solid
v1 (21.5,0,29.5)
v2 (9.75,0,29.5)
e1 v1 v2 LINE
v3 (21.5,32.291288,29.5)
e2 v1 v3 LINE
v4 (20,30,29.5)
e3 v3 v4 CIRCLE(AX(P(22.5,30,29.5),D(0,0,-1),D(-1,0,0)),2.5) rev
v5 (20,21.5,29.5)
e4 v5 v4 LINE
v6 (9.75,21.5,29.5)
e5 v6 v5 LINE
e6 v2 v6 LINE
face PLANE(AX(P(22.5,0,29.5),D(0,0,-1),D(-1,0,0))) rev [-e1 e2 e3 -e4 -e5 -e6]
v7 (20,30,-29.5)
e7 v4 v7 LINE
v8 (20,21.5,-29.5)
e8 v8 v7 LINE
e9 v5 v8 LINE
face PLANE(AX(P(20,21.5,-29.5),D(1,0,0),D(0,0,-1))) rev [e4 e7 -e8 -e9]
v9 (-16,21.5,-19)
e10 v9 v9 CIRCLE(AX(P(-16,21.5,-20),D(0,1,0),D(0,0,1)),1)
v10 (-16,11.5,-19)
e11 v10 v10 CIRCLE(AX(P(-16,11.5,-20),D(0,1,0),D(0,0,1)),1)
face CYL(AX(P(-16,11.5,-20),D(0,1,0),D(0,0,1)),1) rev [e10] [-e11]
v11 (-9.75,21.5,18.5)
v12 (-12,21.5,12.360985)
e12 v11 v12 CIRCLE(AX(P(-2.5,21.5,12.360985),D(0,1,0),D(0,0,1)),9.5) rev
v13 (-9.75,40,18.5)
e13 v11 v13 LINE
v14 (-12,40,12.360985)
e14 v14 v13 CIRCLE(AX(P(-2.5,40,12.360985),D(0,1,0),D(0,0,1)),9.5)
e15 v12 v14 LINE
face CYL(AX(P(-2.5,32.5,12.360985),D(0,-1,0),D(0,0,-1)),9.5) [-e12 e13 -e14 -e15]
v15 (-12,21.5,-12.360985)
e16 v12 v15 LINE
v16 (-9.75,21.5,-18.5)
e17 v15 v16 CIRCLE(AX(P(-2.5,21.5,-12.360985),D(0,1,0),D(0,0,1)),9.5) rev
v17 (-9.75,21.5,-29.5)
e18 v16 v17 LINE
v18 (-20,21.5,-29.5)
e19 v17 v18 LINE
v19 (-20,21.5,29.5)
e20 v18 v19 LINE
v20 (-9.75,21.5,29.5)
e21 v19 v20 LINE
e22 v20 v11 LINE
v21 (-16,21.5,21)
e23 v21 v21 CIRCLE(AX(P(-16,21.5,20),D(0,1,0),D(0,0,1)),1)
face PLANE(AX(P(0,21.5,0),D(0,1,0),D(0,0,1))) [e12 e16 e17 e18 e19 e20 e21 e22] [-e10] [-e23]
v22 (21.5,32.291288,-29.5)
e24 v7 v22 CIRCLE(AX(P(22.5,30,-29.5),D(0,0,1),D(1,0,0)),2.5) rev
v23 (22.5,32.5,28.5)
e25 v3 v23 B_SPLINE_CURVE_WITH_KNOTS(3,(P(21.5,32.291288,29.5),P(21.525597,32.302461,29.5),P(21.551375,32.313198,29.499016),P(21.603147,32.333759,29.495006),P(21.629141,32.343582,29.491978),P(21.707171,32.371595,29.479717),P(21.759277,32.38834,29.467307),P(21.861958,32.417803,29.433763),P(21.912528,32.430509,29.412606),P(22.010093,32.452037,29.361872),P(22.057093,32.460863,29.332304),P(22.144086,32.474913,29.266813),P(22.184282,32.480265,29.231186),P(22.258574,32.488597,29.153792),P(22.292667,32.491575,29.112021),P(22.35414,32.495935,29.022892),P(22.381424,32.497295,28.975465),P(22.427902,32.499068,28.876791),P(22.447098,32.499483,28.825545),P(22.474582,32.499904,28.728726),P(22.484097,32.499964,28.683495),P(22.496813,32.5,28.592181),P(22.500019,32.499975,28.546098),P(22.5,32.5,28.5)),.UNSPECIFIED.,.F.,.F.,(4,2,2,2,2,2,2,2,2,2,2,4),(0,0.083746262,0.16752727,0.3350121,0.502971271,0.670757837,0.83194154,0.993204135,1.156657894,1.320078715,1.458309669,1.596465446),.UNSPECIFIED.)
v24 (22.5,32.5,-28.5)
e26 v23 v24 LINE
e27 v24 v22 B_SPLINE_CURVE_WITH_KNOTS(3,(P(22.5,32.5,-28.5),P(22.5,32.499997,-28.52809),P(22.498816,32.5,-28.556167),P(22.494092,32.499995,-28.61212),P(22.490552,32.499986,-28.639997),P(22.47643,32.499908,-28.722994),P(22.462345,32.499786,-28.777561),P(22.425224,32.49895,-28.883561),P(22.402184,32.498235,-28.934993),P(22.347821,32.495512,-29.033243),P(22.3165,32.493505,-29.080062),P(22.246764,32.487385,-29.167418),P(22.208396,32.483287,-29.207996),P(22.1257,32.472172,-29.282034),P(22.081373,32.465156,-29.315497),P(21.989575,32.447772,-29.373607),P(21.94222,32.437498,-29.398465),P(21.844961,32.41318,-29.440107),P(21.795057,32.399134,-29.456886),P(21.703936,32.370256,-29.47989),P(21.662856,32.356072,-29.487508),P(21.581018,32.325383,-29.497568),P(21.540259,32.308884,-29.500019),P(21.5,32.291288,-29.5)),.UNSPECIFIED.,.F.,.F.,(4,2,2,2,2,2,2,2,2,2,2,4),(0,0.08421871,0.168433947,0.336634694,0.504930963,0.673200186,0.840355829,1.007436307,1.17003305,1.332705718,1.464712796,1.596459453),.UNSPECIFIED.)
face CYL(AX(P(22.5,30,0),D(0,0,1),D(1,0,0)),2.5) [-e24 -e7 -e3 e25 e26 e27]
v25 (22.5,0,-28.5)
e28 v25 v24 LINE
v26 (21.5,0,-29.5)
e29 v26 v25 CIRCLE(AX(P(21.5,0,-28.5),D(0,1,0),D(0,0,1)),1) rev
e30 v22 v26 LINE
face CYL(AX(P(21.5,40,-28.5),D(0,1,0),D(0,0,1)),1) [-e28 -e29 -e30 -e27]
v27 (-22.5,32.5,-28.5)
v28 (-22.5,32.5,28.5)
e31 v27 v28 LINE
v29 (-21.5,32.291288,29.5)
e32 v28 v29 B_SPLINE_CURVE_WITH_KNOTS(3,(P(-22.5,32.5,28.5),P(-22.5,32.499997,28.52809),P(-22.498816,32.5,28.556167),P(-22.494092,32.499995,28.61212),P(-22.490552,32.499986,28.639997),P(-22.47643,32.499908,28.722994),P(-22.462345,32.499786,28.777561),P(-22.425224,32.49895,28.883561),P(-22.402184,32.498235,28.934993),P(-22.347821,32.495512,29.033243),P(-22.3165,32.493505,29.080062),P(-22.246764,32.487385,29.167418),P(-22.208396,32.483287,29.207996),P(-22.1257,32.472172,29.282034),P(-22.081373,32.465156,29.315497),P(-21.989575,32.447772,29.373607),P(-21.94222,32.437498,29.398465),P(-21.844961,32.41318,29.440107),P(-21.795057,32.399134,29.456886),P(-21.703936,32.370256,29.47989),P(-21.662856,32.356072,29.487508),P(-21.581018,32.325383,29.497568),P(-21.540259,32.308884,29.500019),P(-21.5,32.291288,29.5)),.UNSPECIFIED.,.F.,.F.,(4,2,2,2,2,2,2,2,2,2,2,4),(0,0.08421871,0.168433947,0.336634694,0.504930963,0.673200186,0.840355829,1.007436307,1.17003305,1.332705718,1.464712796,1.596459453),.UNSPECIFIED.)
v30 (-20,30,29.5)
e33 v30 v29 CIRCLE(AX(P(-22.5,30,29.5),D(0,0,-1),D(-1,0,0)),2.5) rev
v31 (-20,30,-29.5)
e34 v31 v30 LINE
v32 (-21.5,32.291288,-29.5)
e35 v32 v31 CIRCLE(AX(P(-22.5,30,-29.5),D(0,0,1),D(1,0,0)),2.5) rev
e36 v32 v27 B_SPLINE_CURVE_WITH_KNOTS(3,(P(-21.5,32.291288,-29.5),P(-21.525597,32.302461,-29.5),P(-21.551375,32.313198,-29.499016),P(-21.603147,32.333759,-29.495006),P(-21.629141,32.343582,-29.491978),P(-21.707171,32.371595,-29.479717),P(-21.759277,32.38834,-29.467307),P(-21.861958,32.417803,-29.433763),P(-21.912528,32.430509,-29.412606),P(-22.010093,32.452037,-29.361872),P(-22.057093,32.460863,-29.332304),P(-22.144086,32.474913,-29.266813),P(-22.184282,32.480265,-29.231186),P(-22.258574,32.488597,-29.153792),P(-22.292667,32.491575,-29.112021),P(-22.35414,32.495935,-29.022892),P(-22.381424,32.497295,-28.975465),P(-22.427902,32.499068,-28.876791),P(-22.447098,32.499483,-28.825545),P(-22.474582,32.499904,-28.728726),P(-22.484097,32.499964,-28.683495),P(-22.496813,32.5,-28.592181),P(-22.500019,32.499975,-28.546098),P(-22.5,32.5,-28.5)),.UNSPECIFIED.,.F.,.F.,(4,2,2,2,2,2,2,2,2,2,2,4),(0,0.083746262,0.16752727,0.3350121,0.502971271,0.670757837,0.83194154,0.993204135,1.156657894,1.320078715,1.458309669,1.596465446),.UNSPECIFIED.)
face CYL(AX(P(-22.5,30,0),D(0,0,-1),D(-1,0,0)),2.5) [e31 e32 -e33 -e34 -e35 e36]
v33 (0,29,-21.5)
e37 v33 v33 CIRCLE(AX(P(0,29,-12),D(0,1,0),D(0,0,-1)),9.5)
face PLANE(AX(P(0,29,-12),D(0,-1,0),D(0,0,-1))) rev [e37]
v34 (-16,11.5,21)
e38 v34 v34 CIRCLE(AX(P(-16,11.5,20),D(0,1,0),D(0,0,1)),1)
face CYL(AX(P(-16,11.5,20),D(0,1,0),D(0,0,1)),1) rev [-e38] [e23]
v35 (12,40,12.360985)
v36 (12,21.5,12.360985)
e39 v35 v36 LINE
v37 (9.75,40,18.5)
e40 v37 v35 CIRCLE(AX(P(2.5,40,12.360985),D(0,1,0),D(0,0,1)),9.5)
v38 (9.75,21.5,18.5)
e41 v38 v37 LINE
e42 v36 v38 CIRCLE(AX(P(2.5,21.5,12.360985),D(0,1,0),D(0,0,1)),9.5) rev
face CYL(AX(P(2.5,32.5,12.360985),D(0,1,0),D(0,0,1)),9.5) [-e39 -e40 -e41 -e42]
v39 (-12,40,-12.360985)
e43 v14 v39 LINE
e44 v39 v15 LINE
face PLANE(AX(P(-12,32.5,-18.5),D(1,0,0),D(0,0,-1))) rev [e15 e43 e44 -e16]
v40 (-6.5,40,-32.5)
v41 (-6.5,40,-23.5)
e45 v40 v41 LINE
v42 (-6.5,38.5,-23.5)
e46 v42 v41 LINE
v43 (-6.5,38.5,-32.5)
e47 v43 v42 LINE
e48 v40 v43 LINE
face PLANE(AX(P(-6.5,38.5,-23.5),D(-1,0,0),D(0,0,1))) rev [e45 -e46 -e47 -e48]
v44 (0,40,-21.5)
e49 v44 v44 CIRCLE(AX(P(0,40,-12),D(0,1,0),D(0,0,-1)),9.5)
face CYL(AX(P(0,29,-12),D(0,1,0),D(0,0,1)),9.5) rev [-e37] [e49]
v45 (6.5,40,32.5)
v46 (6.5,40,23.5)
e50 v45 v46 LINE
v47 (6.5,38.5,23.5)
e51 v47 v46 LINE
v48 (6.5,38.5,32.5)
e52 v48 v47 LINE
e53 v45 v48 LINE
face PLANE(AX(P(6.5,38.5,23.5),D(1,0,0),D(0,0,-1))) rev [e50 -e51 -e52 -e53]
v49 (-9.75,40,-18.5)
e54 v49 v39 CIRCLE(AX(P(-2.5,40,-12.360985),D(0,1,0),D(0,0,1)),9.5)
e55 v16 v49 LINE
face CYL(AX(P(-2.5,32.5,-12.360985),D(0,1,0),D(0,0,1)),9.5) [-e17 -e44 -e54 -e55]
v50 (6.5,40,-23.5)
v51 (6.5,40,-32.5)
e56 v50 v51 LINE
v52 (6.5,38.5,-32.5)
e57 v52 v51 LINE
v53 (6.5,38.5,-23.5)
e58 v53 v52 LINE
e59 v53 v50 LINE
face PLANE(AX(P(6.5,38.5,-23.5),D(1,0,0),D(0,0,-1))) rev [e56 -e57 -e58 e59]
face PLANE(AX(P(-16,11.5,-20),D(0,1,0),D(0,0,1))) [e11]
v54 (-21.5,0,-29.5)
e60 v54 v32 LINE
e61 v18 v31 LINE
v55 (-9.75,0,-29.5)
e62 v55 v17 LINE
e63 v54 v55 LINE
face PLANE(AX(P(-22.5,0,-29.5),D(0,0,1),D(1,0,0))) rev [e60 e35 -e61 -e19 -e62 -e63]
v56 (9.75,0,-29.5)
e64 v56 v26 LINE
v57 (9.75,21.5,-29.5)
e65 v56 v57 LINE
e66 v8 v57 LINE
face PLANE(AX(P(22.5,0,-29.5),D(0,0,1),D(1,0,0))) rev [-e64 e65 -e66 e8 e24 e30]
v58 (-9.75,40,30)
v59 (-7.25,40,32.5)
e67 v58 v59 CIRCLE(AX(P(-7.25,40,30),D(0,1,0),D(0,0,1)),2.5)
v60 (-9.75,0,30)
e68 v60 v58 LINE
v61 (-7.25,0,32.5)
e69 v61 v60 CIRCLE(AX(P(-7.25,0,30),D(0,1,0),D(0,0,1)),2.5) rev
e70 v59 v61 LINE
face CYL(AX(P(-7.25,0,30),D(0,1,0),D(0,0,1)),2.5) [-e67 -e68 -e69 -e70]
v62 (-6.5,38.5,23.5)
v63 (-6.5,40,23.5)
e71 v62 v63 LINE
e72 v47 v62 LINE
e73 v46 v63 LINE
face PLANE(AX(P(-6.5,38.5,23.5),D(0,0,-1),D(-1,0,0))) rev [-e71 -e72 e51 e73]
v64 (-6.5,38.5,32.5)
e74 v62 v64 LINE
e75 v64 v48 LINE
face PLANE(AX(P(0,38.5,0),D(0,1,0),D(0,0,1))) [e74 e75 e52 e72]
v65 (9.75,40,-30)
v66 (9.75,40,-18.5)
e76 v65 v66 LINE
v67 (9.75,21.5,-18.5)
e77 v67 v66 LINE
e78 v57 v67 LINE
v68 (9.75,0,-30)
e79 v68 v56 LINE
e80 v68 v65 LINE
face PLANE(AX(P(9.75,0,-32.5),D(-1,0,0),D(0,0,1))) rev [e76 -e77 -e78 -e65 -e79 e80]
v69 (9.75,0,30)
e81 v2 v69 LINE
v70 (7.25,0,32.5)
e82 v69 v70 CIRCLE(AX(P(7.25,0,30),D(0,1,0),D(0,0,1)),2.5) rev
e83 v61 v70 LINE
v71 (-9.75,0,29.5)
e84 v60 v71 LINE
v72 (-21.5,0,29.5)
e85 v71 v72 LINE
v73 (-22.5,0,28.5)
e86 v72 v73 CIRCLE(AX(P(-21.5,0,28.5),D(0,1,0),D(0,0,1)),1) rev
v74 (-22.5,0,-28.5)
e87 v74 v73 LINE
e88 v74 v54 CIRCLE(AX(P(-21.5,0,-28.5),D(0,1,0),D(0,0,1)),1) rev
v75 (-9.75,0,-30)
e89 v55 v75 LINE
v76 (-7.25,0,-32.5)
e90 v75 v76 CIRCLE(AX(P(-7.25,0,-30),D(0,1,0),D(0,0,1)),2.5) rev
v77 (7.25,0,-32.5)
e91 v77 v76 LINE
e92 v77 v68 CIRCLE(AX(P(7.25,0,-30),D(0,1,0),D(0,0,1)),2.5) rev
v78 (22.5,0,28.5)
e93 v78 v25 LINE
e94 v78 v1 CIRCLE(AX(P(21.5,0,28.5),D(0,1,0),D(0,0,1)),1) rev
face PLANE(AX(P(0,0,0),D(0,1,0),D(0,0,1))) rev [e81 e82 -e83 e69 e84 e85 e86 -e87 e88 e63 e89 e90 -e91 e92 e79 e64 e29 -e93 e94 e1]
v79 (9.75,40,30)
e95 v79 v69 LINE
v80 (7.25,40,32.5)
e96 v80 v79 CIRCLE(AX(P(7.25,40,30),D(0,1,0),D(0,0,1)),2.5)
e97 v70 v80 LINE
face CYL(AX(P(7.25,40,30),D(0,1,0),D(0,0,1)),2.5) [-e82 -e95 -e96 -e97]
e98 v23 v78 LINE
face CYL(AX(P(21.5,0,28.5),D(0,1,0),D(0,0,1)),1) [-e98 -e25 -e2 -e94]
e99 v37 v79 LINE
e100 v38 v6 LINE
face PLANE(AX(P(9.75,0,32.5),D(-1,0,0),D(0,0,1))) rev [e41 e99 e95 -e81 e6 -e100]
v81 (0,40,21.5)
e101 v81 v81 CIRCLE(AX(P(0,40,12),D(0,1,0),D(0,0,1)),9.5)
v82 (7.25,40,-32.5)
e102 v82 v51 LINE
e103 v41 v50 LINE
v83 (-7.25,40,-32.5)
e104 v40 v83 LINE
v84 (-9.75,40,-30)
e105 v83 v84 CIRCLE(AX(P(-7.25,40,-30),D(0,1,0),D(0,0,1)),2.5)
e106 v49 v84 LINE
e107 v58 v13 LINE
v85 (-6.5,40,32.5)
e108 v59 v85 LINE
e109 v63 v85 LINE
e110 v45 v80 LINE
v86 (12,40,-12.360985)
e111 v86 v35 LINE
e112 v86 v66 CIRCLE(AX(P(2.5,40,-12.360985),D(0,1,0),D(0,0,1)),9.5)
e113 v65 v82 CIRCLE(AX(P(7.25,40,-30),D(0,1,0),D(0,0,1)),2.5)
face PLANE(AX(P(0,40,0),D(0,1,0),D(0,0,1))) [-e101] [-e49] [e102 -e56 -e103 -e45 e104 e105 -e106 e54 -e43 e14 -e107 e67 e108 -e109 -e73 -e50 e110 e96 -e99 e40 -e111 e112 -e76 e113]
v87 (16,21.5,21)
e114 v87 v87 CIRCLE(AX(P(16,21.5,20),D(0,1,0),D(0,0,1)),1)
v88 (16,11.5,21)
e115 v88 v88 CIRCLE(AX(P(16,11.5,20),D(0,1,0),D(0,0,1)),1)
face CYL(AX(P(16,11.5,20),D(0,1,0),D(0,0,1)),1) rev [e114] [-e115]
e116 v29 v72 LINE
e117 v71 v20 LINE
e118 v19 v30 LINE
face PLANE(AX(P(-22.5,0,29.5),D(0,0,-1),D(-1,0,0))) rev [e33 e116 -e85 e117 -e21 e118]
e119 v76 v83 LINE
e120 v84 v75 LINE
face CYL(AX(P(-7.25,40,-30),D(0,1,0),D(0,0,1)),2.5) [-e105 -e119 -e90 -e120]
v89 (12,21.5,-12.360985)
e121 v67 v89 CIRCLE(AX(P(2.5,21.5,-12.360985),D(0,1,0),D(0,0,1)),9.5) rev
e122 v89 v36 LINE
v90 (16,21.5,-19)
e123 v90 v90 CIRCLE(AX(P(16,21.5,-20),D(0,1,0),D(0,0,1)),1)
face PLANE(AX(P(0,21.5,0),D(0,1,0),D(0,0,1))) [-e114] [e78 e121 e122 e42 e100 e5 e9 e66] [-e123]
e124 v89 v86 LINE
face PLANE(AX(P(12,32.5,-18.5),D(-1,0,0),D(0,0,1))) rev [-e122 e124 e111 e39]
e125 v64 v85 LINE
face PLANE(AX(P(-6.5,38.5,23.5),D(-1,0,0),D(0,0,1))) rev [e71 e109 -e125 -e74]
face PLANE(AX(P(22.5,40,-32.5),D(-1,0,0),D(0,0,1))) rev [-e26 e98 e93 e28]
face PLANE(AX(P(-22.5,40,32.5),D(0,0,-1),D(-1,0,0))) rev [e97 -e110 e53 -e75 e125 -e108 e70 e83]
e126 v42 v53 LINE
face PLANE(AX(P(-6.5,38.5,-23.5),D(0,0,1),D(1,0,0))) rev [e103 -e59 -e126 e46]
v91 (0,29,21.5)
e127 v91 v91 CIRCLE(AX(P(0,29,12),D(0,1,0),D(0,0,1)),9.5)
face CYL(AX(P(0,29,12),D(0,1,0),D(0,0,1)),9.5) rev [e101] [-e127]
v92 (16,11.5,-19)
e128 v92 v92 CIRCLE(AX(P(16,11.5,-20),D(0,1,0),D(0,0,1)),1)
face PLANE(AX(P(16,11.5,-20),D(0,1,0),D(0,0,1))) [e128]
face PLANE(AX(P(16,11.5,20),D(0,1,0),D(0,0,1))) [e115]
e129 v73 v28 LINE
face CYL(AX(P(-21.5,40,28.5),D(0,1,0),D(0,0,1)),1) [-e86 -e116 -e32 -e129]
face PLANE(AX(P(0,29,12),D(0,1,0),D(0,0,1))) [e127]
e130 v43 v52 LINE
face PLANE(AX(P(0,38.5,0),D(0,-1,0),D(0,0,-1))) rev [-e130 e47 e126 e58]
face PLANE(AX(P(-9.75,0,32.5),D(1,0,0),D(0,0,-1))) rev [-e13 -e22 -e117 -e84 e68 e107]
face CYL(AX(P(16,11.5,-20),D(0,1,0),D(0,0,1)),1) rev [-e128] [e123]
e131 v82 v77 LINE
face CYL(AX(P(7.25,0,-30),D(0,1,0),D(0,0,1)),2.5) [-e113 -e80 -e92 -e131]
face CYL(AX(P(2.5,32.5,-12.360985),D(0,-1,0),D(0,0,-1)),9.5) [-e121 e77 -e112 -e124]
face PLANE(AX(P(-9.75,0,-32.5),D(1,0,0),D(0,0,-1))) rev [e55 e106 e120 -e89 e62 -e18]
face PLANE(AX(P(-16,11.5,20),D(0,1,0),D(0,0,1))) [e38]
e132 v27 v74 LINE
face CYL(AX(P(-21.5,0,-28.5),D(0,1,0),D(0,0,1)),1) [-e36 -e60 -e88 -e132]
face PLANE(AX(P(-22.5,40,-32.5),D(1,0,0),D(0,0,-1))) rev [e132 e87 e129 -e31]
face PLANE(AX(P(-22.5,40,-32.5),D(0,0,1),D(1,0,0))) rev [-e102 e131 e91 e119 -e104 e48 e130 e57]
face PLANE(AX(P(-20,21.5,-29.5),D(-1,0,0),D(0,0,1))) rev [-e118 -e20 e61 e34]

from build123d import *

# Parameters (mm, degrees)
SKETCH1_W           = 45
SKETCH1_H           = 65
BOSS_EXTRUDE1_DEPTH = 40
SKETCH2_W           = 12.75
SKETCH2_H           = 3
CUT_EXTRUDE1_DEPTH  = 40
CUT_EXTRUDE2_DEPTH  = 7.5
CUT_EXTRUDE3_DEPTH  = 18.5
SKETCH6_W           = 13
SKETCH6_H           = 23
CUT_EXTRUDE4_DEPTH  = 1.5
SKETCH7_R           = 9.5
CUT_EXTRUDE5_DEPTH  = 11
SKETCH8_R           = 1
CUT_EXTRUDE6_DEPTH  = 10
FILLET1_R           = 2.5
FILLET2_R           = 2.5
FILLET3_R           = 2.5
FILLET4_R           = 1
FILLET5_R           = 9.5


# Some blends are built 0.0001 mm under size
with BuildPart() as part:
    # Sketch1 → Boss-Extrude1 (new body)
    with BuildSketch(Plane(origin=(0, 0, 0), x_dir=(1, 0, 0), z_dir=(0, 1, 0))):
        Rectangle(SKETCH1_W, SKETCH1_H)
    extrude(amount=BOSS_EXTRUDE1_DEPTH)

    # Sketch2 → Cut-Extrude1 (cut)
    with BuildSketch(Plane(origin=(0, 40, 0), x_dir=(1, 0, 0), z_dir=(0, 1, 0))):
        with Locations((-16.125, 31)):
            Rectangle(SKETCH2_W, SKETCH2_H)
        with Locations((16.125, 31)):
            Rectangle(SKETCH2_W, SKETCH2_H)
        with Locations((-16.125, -31)):
            Rectangle(SKETCH2_W, SKETCH2_H)
        with Locations((16.125, -31)):
            Rectangle(SKETCH2_W, SKETCH2_H)
    extrude(amount=-CUT_EXTRUDE1_DEPTH, mode=Mode.SUBTRACT)

    # Sketch3 → Cut-Extrude2 (cut)
    with BuildSketch(Plane(origin=(0, 40, 0), x_dir=(1, 0, 0), z_dir=(0, 1, 0))):
        Polygon((-22.5, 29.5), (-9.75, 29.5), (-9.75, 18.5), (-12, 18.5), (-12, -18.5), (-9.75, -18.5), (-9.75, -29.5), (-22.5, -29.5), (-22.5, -18.5), (-22.5, 18.5), align=None)
        Polygon((22.5, -29.5), (9.75, -29.5), (9.75, -18.5), (12, -18.5), (12, 18.5), (9.75, 18.5), (9.75, 29.5), (22.5, 29.5), (22.5, 18.5), (22.5, -18.5), align=None)
    extrude(amount=-CUT_EXTRUDE2_DEPTH, mode=Mode.SUBTRACT)

    # Sketch5 → Cut-Extrude3 (cut)
    with BuildSketch(Plane(origin=(0, 40, 0), x_dir=(1, 0, 0), z_dir=(0, 1, 0))):
        Polygon((-20, 29.5), (-12, 29.5), (-9.75, 29.5), (-9.75, 18.5), (-12, 18.5), (-12, -18.5), (-9.75, -18.5), (-9.75, -29.5), (-12, -29.5), (-20, -29.5), align=None)
        Polygon((12, -29.5), (9.75, -29.5), (9.75, -18.5), (12, -18.5), (12, 18.5), (9.75, 18.5), (9.75, 29.5), (12, 29.5), (20, 29.5), (20, -29.5), align=None)
    extrude(amount=-CUT_EXTRUDE3_DEPTH, mode=Mode.SUBTRACT)

    # Sketch6 → Cut-Extrude4 (cut)
    with BuildSketch(Plane(origin=(0, 40, 0), x_dir=(1, 0, 0), z_dir=(0, 1, 0))):
        with Locations((0, 35)):
            Rectangle(SKETCH6_W, SKETCH6_H)
        with Locations((0, -35)):
            Rectangle(SKETCH6_W, SKETCH6_H)
    extrude(amount=-CUT_EXTRUDE4_DEPTH, mode=Mode.SUBTRACT)

    # Sketch7 → Cut-Extrude5 (cut)
    with BuildSketch(Plane(origin=(0, 40, 0), x_dir=(1, 0, 0), z_dir=(0, 1, 0))):
        with Locations(Location((0, -12, 0), (0, 0, 270))):
            Circle(SKETCH7_R)
        with Locations(Location((0, 12, 0), (0, 0, 90))):
            Circle(SKETCH7_R)
    extrude(amount=-CUT_EXTRUDE5_DEPTH, mode=Mode.SUBTRACT)

    # Sketch8 → Cut-Extrude6 (cut)
    with BuildSketch(Plane(origin=(0, 21.5, 0), x_dir=(1, 0, 0), z_dir=(0, 1, 0))):
        with Locations(Location((-16, 20, 0), (0, 0, 270))):
            Circle(SKETCH8_R)
        with Locations(Location((16, 20, 0), (0, 0, 270))):
            Circle(SKETCH8_R)
        with Locations(Location((16, -20, 0), (0, 0, 270))):
            Circle(SKETCH8_R)
        with Locations(Location((-16, -20, 0), (0, 0, 270))):
            Circle(SKETCH8_R)
    extrude(amount=-CUT_EXTRUDE6_DEPTH, mode=Mode.SUBTRACT)

    # Fillet1
    fillet1_edges = [part.edges().sort_by_distance(p)[0] for p in [
        (-20, 32.5, 0),
    ]]
    fillet(fillet1_edges, radius=FILLET1_R - 0.0001)  # a hair under: the kernel refuses the full size

    # Fillet2
    fillet2_edges = [part.edges().sort_by_distance(p)[0] for p in [
        (20, 32.5, 0),
    ]]
    fillet(fillet2_edges, radius=FILLET2_R - 0.0001)  # a hair under: the kernel refuses the full size

    # Fillet3
    fillet3_edges = [part.edges().sort_by_distance(p)[0] for p in [
        (9.75, 20, -32.5),
        (-9.75, 20, 32.5),
        (-9.75, 20, -32.5),
        (9.75, 20, 32.5),
    ]]
    fillet(fillet3_edges, radius=FILLET3_R)

    # Fillet4
    fillet4_edges = [part.edges().sort_by_distance(p)[0] for p in [
        (22.5, 16.25, -29.5),
        (-22.5, 16.25, 29.5),
        (-22.5, 16.25, -29.5),
        (22.5, 16.25, 29.5),
    ]]
    fillet(fillet4_edges, radius=FILLET4_R)

    # Fillet5
    # the kernel refuses this fillet: 9.5 mm, written as the material it takes off along each edge
    with BuildSketch(Plane(origin=(12, 55.347536447, 18.5), x_dir=(-1, 0, 0), z_dir=(0, -1, 0)), Plane(origin=(-12, 55.347536447, -18.5), x_dir=(1, 0, 0), z_dir=(0, -1, 0))) as fillet5_piece_1:
        with BuildLine():
            CenterArc((9.5, 6.139014579), FILLET5_R, 180, 40.256612576)
            Line((0, 6.139014579), (-0.19, 6.139014579))
            Line((-0.19, 6.139014579), (-0.19, 0))
            Line((-0.19, 0), (0, -0.19))
            ThreePointArc((0, -0.19), (1.125, -0.19), (2.105, -0.122780292))
            Line((2.105, -0.122780292), (2.25, 0))
        make_face()
    extrude(amount=33.847536447, mode=Mode.SUBTRACT)
    with BuildSketch(Plane(origin=(-12, 55.347536447, 18.5), x_dir=(1, 0, 0), z_dir=(0, -1, 0)), Plane(origin=(12, 55.347536447, -18.5), x_dir=(-1, 0, 0), z_dir=(0, -1, 0))) as fillet5_piece_2:
        with BuildLine():
            CenterArc((9.5, -6.139014579), FILLET5_R, 139.743387424, 40.256612576)
            Line((0, -6.139014579), (-0.19, -6.139014579))
            Line((-0.19, -6.139014579), (-0.19, 0))
            Line((-0.19, 0), (0, 0.19))
            ThreePointArc((0, 0.19), (1.125, 0.19), (2.105, 0.122780292))
            Line((2.105, 0.122780292), (2.25, 0))
        make_face()
    extrude(amount=33.847536447, mode=Mode.SUBTRACT)


solid = part.part
